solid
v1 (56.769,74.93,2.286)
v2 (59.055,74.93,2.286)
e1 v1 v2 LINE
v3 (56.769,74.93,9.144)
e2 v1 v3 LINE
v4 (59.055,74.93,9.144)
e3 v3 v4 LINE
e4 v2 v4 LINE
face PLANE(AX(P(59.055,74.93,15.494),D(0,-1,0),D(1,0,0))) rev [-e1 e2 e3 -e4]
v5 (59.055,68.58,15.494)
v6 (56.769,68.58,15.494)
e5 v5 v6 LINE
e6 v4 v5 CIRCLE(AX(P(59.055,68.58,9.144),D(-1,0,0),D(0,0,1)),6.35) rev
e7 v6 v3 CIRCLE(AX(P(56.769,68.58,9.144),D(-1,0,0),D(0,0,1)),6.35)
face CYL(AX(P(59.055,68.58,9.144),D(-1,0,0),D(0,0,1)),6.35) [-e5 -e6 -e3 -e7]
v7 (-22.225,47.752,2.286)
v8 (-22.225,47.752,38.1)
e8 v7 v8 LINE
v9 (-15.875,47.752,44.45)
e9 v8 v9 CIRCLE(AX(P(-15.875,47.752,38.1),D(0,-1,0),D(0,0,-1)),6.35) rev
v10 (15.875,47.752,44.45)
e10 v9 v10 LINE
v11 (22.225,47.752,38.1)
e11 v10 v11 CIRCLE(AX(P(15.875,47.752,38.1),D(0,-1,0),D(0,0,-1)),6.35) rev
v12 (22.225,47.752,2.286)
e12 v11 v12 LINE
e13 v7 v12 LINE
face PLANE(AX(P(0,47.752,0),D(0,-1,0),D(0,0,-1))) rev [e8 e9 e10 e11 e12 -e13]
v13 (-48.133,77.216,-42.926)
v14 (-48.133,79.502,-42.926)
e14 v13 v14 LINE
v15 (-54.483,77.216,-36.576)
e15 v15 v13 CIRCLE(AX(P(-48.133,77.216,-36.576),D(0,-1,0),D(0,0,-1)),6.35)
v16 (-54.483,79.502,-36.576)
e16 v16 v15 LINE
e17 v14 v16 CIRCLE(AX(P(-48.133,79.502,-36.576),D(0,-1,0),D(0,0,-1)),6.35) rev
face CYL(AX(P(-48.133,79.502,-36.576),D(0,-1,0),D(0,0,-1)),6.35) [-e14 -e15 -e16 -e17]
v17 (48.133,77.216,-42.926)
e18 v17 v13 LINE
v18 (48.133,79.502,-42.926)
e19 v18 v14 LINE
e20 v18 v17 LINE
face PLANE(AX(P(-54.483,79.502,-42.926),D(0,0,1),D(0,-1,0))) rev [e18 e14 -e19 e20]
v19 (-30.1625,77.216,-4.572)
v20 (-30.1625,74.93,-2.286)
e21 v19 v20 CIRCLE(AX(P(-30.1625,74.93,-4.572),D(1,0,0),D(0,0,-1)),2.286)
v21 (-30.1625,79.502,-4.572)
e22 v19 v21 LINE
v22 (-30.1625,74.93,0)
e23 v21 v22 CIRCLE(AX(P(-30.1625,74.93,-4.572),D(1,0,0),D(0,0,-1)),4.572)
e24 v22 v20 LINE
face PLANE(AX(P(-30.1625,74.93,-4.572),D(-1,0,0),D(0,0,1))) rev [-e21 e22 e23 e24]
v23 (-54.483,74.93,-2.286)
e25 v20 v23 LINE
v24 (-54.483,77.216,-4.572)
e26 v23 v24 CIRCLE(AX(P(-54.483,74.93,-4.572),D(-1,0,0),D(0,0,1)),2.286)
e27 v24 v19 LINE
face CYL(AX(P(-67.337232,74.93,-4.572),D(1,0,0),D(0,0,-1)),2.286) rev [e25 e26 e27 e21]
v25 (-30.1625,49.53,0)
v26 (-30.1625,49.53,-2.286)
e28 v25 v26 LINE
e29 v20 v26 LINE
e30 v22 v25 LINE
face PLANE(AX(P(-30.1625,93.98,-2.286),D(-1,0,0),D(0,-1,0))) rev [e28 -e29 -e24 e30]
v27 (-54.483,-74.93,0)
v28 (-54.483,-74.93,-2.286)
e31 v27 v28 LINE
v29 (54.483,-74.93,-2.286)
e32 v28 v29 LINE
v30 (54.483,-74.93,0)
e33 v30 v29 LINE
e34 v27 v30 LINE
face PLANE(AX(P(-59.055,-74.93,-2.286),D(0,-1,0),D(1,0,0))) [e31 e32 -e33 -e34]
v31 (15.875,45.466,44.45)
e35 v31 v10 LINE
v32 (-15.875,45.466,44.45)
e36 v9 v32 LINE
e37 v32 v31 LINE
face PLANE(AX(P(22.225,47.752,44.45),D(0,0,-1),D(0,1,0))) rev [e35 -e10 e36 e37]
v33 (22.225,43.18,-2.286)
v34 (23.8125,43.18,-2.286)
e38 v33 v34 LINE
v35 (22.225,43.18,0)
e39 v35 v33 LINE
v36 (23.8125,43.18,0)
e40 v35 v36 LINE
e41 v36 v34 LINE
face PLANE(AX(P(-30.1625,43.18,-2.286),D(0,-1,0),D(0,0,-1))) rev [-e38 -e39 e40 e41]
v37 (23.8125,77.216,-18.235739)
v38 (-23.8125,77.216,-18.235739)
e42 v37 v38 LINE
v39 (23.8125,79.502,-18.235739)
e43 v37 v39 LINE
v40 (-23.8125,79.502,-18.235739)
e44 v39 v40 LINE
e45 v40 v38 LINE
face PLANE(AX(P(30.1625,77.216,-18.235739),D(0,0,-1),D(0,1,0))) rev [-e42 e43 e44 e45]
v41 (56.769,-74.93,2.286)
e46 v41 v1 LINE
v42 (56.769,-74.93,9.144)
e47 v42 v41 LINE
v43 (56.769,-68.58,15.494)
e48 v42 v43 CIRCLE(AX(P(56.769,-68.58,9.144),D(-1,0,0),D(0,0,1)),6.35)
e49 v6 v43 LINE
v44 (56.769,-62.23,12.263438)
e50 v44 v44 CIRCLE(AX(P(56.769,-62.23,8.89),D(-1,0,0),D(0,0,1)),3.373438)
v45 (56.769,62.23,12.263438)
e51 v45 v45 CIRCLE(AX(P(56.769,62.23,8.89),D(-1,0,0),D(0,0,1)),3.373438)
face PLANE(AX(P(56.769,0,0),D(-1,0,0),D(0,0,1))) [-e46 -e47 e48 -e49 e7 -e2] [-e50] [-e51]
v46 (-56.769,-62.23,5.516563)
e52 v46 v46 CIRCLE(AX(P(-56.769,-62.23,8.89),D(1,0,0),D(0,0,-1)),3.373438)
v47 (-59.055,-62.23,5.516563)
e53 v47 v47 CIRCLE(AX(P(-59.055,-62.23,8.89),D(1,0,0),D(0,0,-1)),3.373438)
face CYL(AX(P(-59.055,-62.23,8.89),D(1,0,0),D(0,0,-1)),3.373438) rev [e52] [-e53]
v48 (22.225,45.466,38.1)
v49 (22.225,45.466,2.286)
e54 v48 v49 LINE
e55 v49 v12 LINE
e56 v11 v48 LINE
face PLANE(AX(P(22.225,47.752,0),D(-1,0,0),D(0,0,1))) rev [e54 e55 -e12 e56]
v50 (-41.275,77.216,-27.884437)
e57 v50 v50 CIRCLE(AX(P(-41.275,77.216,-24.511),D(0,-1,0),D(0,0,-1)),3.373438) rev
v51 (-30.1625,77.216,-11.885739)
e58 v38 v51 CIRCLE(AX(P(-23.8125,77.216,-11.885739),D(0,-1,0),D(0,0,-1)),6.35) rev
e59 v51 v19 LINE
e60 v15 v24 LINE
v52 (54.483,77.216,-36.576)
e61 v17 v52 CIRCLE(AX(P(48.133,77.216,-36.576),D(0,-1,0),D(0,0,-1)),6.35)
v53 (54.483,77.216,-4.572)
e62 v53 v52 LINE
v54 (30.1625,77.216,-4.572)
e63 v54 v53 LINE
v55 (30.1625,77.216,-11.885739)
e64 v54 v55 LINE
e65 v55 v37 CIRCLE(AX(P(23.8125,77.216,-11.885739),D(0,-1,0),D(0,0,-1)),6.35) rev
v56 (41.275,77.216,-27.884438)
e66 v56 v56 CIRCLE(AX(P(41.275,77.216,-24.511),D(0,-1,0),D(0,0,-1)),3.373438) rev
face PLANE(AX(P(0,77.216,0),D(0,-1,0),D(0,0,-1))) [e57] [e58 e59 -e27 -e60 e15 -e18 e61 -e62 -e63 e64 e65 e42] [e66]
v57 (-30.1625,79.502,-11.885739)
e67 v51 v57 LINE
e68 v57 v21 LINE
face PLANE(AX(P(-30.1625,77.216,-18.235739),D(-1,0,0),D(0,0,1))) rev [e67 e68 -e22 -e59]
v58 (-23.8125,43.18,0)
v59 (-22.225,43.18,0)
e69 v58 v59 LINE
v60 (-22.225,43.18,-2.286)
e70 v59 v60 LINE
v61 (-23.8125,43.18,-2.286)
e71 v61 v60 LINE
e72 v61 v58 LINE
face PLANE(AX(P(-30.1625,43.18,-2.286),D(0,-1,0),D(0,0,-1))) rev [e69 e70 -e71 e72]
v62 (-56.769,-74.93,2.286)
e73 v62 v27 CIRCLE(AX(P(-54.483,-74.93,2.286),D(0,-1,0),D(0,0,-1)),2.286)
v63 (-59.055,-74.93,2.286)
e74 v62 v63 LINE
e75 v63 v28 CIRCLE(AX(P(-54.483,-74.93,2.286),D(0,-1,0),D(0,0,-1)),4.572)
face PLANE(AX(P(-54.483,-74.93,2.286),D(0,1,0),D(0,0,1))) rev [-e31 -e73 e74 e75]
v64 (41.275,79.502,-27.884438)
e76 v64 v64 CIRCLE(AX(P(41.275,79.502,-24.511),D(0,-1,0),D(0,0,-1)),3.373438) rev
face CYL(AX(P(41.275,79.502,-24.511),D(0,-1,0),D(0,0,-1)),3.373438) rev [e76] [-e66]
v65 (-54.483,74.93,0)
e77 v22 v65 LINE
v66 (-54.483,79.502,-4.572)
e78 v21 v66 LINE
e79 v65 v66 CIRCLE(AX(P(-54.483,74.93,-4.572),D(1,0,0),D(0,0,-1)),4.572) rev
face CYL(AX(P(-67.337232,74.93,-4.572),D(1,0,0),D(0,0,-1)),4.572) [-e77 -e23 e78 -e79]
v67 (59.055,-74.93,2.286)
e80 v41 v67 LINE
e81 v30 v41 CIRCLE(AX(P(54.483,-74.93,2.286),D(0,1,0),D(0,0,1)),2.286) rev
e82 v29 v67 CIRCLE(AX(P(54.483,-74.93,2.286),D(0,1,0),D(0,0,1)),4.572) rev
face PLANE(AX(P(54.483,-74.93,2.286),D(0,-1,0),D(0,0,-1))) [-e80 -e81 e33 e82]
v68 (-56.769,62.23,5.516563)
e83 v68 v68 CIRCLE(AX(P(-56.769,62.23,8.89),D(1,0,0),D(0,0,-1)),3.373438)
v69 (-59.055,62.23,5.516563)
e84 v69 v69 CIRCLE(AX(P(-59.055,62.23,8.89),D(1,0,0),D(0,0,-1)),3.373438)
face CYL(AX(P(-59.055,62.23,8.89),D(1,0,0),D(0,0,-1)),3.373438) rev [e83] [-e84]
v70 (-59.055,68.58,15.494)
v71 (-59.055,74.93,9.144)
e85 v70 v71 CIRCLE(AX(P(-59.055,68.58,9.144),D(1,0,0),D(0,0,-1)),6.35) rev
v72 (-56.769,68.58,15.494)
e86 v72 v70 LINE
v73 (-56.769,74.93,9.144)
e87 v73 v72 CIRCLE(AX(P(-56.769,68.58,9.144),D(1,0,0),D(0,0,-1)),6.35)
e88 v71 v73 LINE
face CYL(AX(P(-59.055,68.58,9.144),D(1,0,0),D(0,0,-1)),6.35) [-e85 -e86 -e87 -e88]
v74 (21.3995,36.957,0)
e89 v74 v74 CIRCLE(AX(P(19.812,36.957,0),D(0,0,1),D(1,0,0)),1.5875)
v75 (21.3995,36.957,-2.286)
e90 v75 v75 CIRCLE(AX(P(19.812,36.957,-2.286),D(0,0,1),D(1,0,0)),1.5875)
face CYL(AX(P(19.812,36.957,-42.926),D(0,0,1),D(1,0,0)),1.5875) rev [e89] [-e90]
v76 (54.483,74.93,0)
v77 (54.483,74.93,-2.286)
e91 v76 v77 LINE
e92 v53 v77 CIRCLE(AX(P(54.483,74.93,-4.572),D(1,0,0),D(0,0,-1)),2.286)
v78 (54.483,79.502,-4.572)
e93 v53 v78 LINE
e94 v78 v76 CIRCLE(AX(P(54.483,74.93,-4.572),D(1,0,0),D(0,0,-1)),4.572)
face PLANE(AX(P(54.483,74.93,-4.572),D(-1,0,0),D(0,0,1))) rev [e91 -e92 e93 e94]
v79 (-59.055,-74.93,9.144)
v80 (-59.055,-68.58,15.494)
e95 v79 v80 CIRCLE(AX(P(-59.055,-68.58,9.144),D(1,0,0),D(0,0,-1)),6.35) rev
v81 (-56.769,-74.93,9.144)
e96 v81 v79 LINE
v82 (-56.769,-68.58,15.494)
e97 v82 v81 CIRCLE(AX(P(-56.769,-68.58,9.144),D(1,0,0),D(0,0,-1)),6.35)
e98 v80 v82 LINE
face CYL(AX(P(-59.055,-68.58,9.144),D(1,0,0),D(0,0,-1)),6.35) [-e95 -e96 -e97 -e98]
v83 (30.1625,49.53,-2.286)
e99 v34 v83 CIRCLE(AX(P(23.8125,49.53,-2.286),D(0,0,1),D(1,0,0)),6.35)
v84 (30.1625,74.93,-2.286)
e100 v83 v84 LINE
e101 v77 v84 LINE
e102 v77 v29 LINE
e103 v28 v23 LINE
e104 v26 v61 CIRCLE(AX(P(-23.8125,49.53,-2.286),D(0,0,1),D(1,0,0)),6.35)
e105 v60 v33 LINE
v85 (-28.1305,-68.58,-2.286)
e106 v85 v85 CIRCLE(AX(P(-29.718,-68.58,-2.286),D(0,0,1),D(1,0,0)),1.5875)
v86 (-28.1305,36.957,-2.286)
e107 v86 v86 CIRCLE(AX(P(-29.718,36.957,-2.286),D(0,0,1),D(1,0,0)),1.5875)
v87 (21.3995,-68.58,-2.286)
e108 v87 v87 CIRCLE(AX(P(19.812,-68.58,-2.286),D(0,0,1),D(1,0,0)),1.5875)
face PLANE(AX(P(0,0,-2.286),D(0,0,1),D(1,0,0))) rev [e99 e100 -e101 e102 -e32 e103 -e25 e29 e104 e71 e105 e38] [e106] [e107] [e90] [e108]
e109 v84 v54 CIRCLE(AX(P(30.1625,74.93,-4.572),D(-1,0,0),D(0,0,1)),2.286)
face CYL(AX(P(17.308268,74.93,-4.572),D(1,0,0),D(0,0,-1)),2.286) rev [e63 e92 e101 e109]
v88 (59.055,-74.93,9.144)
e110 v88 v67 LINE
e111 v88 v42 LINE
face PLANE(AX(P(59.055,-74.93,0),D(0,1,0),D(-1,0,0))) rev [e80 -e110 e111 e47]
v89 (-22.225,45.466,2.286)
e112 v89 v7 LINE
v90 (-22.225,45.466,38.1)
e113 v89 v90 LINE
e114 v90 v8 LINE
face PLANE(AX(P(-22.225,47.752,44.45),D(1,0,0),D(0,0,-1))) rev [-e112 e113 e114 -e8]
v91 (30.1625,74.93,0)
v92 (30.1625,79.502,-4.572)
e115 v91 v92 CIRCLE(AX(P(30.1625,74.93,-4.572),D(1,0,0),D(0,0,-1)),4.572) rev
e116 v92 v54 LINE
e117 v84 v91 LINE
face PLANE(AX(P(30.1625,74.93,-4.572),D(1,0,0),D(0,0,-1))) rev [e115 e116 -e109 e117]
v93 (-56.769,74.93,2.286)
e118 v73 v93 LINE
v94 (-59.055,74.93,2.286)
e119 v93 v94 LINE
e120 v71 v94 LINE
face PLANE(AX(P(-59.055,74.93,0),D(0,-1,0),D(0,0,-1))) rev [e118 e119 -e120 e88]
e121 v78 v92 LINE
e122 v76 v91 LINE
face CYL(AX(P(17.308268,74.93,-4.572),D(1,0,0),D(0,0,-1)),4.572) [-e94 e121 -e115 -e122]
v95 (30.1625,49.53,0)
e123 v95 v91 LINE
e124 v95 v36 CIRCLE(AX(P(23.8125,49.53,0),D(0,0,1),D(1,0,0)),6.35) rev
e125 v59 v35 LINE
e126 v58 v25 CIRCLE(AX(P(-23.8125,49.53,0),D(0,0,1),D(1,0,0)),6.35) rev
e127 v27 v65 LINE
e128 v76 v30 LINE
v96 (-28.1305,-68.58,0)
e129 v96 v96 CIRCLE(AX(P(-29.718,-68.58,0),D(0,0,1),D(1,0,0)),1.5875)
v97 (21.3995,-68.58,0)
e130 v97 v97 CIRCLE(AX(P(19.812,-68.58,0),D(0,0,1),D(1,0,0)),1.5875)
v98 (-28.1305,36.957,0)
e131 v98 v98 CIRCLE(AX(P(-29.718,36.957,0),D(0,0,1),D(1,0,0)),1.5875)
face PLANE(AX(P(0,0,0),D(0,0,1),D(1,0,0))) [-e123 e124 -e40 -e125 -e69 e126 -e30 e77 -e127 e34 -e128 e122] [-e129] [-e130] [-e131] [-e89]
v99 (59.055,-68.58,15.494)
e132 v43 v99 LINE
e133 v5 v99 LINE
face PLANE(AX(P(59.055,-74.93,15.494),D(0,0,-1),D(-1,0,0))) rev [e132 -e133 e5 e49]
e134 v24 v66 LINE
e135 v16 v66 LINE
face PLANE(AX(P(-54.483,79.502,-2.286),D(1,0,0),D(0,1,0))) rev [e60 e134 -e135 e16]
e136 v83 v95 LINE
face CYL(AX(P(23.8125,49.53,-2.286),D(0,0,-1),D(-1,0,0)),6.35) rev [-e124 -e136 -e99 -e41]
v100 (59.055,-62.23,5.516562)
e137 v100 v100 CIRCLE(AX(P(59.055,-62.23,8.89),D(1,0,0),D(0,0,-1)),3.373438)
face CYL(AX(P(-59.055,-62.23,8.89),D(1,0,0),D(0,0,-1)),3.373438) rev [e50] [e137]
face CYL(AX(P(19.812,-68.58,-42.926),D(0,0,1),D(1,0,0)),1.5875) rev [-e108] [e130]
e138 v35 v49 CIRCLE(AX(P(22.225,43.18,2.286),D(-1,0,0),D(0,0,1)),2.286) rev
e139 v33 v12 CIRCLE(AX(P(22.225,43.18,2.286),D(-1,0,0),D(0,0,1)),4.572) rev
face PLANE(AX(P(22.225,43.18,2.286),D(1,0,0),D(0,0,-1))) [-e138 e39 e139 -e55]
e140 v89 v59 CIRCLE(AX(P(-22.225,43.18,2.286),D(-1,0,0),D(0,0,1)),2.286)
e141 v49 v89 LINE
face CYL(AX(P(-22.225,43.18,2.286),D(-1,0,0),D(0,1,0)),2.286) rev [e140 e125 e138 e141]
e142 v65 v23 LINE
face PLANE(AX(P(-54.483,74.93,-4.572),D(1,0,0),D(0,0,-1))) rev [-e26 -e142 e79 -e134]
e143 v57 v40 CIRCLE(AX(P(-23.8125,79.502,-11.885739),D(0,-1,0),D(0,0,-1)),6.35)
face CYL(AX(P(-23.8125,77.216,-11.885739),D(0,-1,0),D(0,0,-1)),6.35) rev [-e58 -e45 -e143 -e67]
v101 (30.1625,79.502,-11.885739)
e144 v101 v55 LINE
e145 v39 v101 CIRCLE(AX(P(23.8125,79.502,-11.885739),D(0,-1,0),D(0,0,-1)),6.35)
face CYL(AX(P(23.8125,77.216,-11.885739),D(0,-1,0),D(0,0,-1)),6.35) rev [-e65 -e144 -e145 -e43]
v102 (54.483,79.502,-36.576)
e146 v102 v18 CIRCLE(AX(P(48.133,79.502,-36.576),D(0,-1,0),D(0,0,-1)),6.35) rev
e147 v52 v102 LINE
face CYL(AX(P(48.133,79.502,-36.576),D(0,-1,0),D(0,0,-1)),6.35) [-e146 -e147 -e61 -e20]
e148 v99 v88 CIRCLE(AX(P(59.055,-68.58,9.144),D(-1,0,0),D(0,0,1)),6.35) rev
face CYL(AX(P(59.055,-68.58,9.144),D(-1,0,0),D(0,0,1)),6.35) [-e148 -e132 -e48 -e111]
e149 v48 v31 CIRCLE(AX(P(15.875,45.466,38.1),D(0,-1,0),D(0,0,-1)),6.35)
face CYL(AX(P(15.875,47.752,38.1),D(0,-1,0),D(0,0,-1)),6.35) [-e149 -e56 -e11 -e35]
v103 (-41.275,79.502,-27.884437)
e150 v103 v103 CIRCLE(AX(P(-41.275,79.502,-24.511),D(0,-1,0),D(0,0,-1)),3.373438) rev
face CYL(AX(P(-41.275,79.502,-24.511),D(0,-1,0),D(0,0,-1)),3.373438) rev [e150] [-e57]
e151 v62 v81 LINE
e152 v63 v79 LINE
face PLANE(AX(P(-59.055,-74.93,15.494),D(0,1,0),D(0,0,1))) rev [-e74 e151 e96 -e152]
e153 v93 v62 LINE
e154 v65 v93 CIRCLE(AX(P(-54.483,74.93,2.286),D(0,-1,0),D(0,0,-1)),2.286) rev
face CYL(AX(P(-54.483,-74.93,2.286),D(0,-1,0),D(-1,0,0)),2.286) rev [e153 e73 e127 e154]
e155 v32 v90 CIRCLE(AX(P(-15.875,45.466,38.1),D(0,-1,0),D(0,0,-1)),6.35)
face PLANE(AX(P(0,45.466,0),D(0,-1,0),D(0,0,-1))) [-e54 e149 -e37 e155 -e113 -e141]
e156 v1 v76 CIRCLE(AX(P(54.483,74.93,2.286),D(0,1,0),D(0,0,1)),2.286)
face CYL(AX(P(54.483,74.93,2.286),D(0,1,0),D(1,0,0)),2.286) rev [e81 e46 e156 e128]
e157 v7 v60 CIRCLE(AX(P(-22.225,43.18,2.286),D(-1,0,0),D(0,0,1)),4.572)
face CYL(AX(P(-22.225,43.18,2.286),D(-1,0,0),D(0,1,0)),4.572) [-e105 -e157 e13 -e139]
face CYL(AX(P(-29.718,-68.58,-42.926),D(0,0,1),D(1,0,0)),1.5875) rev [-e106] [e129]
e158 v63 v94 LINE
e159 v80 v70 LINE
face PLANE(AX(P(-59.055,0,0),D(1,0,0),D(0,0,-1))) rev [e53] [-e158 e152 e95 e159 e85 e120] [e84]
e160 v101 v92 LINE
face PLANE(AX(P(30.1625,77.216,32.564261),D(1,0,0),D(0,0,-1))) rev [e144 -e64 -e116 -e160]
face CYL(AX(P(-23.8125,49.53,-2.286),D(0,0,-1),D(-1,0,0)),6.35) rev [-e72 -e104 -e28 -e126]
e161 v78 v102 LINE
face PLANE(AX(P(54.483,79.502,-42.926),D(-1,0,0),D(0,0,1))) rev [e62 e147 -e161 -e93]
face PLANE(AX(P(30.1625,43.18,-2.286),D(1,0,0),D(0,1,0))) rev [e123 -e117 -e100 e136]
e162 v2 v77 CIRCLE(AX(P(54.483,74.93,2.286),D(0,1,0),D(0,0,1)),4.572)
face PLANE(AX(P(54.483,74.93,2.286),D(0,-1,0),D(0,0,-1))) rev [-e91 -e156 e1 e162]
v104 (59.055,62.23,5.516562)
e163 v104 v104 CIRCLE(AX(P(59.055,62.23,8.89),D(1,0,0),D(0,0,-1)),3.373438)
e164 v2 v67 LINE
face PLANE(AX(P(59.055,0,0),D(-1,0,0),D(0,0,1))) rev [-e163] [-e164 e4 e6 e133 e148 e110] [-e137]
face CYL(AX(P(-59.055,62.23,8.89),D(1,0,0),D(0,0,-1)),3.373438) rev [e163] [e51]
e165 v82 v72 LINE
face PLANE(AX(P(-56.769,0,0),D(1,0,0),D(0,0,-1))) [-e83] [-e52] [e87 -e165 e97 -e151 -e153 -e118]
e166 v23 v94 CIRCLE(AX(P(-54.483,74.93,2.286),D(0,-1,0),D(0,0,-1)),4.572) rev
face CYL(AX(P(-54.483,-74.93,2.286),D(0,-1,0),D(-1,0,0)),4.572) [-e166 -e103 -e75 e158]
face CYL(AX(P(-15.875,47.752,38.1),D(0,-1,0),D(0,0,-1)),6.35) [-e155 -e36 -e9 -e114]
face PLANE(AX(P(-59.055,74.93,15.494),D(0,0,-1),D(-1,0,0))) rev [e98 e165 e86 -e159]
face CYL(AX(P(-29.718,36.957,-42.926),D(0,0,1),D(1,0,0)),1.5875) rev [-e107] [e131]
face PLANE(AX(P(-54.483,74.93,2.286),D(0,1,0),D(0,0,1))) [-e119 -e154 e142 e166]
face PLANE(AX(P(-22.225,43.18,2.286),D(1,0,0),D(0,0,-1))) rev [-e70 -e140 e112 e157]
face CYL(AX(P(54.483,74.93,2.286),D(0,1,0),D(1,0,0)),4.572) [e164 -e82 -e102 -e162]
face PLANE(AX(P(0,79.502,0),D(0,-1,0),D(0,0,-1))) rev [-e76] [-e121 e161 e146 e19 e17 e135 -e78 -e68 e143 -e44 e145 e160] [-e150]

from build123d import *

# Parameters (mm, degrees)
SKETCH1_W                      = 118.11
SKETCH1_H                      = 149.86
BASE_FLANGE1_DEPTH             = 2.286
EDGE_FLANGE1_STRIP_W           = 13.716
EDGE_FLANGE1_STRIP_H           = 2.286
EDGE_FLANGE1_STRIP_CUT_DEPTH   = 149.86
EDGE_FLANGE1_STRIP_2_W         = 13.716
EDGE_FLANGE1_STRIP_2_H         = 2.286
EDGE_FLANGE1_STRIP_CUT_2_DEPTH = 149.86
EDGE_FLANGE1_DEPTH             = 149.86
EDGE_FLANGE1_BEND_DEPTH        = 149.86
EDGE_FLANGE10_DEPTH            = 108.966
EDGE_FLANGE10_START            = 2.286
EDGE_FLANGE10_PROFILE_W        = 108.966
EDGE_FLANGE10_PROFILE_H        = 38.354
EDGE_FLANGE10_PROFILE_R        = 3.3734375
EDGE_FLANGE10_FLAT_DEPTH       = 2.286
UNFOLD6_START                  = -42.926
UNFOLD6_OUTLINE_W              = 108.966
UNFOLD6_OUTLINE_H              = 4.572
UNFOLD6_DEPTH                  = 40.64
UNFOLD6_START_2                = -2.286
UNFOLD6_2_OUTLINE_W            = 108.966
UNFOLD6_2_OUTLINE_H            = 43.740260605
UNFOLD6_2_OUTLINE_R            = 3.3734375
UNFOLD6_2_DEPTH                = 2.286
SKETCH121_W                    = 60.325
SKETCH121_H                    = 50.8
CUT_EXTRUDE3_DEPTH             = 134.454815623
EDGE_FLANGE16_DEPTH            = 44.45
FOLD3_START                    = -54.483
FOLD3_DEPTH                    = 108.966
FOLD3_START_2                  = -37.9015624
FOLD3_2_OUTLINE_W              = 2.286
FOLD3_2_OUTLINE_H              = 24.690260605
FOLD3_2_DEPTH                  = 75.8031248
FOLD3_3_DEPTH                  = 9.8345624
FOLD3_START_3                  = 44.6484376
FOLD3_4_DEPTH                  = 9.8345624
FOLD3_5_DEPTH                  = 24.3205
FOLD3_START_4                  = 30.1625
FOLD3_6_DEPTH                  = 24.3205
FOLD3_START_5                  = 77.216
FOLD3_7_DEPTH                  = 2.286
SKETCH128_R                    = 1.5875
CUT_EXTRUDE4_DEPTH             = 109.553505374
FILLET3_R                      = 6.35
SKETCH130_R                    = 3.3734375
CUT_EXTRUDE6_DEPTH             = 150.152078779


with BuildPart() as part:
    # Base-Flange1: sheet metal written as solids
    # Sketch1 → Base-Flange1 (new body)
    with BuildSketch(Plane.XY):
        Rectangle(SKETCH1_W, SKETCH1_H)
    extrude(amount=-BASE_FLANGE1_DEPTH)

    # Edge-Flange1: sheet metal written as solids
    # Edge-Flange1 strip (on a plane across the edge) → Edge-Flange1 strip cut (cut)
    with BuildSketch(Plane(origin=(-59.055, 74.93, 0), x_dir=(1, 0, 0), z_dir=(0, -1, 0))):
        with Locations((-2.286, -1.143)):
            Rectangle(EDGE_FLANGE1_STRIP_W, EDGE_FLANGE1_STRIP_H)
    extrude(amount=EDGE_FLANGE1_STRIP_CUT_DEPTH, mode=Mode.SUBTRACT)

    # Edge-Flange1 strip 2 (on a plane across the edge) → Edge-Flange1 strip cut 2 (cut)
    with BuildSketch(Plane(origin=(59.055, -74.93, 0), x_dir=(-1, 0, 0), z_dir=(0, 1, 0))):
        with Locations((-2.286, -1.143)):
            Rectangle(EDGE_FLANGE1_STRIP_2_W, EDGE_FLANGE1_STRIP_2_H)
    extrude(amount=EDGE_FLANGE1_STRIP_CUT_2_DEPTH, mode=Mode.SUBTRACT)

    # Edge-Flange1 section (on a plane across the edge) → Edge-Flange1 (add)
    with BuildSketch(Plane(origin=(-59.055, 74.93, 0), x_dir=(1, 0, 0), z_dir=(0, -1, 0))):
        with BuildLine():
            Line((0, 2.286), (0, 15.494))
            Line((0, 15.494), (2.286, 15.494))
            Line((2.286, 15.494), (2.286, 2.286))
            ThreePointArc((2.286, 2.286), (2.955553898, 0.669553898), (4.572, 0))
            Line((4.572, 0), (4.572, -2.286))
            ThreePointArc((4.572, -2.286), (1.339107796, -0.946892204), (0, 2.286))
        make_face()
    extrude(amount=EDGE_FLANGE1_DEPTH)

    # Edge-Flange1 section 2 (on a plane across the edge) → Edge-Flange1 bend (add)
    with BuildSketch(Plane(origin=(59.055, -74.93, 0), x_dir=(-1, 0, 0), z_dir=(0, 1, 0))):
        with BuildLine():
            Line((0, 2.286), (0, 15.494))
            Line((0, 15.494), (2.286, 15.494))
            Line((2.286, 15.494), (2.286, 2.286))
            ThreePointArc((2.286, 2.286), (2.955553898, 0.669553898), (4.572, 0))
            Line((4.572, 0), (4.572, -2.286))
            ThreePointArc((4.572, -2.286), (1.339107796, -0.946892204), (0, 2.286))
        make_face()
    extrude(amount=EDGE_FLANGE1_BEND_DEPTH)

    # Edge-Flange10: sheet metal written as solids
    # Edge-Flange10 bend section (on a plane across the edge) → Edge-Flange10 (add)
    with BuildSketch(Plane(origin=(-54.483, 77.216, -2.286), x_dir=(0, -1, 0), z_dir=(1, 0, 0))):
        with BuildLine():
            Line((-2.286, 2.286), (0, 2.286))
            ThreePointArc((0, 2.286), (0.669553898, 0.669553898), (2.286, 0))
            Line((2.286, 0), (2.286, -2.286))
            ThreePointArc((2.286, -2.286), (-0.946892204, -0.946892204), (-2.286, 2.286))
        make_face()
    extrude(amount=EDGE_FLANGE10_DEPTH)

    # Edge-Flange10 profile (on flange) → Edge-Flange10 flat (add)
    with BuildSketch(Plane(origin=(0, 77.216, -2.286), x_dir=(1, 0, 0), z_dir=(0, 1, 0)).offset(EDGE_FLANGE10_START)):
        with Locations((0, 21.463)):
            Rectangle(EDGE_FLANGE10_PROFILE_W, EDGE_FLANGE10_PROFILE_H)
        with Locations((41.275, 22.225)):
            Circle(EDGE_FLANGE10_PROFILE_R, mode=Mode.SUBTRACT)
        with Locations((-41.275, 22.225)):
            Circle(EDGE_FLANGE10_PROFILE_R, mode=Mode.SUBTRACT)
    extrude(amount=-EDGE_FLANGE10_FLAT_DEPTH)

    # Unfold6: read off the stored shape, not the designer's step
    # Unfold6 outline → Unfold6 (cut)
    with BuildSketch(Plane.XY.offset(UNFOLD6_START)):
        with Locations((0, 77.216)):
            Rectangle(UNFOLD6_OUTLINE_W, UNFOLD6_OUTLINE_H)
    extrude(amount=UNFOLD6_DEPTH, mode=Mode.SUBTRACT)

    # Unfold6 2 outline → Unfold6 2 (add)
    with BuildSketch(Plane.XY.offset(UNFOLD6_START_2)):
        with Locations((0, 96.800130303)):
            Rectangle(UNFOLD6_2_OUTLINE_W, UNFOLD6_2_OUTLINE_H)
        with Locations((-41.275, 100.255260605)):
            Circle(UNFOLD6_2_OUTLINE_R, mode=Mode.SUBTRACT)
        with Locations((41.275, 100.255260605)):
            Circle(UNFOLD6_2_OUTLINE_R, mode=Mode.SUBTRACT)
    extrude(amount=UNFOLD6_2_DEPTH)

    # Sketch121 → Cut-Extrude3 (cut, through all)
    with BuildSketch(Plane.XY):
        with Locations((0, 68.58)):
            Rectangle(SKETCH121_W, SKETCH121_H)
    extrude(amount=-CUT_EXTRUDE3_DEPTH, mode=Mode.SUBTRACT)

    # Edge-Flange16: sheet metal written as solids
    # Edge-Flange16 section (on a plane across the edge) → Edge-Flange16 (add)
    with BuildSketch(Plane(origin=(22.225, 45.466, 0), x_dir=(0, -1, 0), z_dir=(-1, 0, 0))):
        with BuildLine():
            Line((-2.286, 2.286), (-2.286, 44.45))
            Line((-2.286, 44.45), (0, 44.45))
            Line((0, 44.45), (0, 2.286))
            ThreePointArc((0, 2.286), (0.669553898, 0.669553898), (2.286, 0))
            Line((2.286, 0), (2.286, -2.286))
            ThreePointArc((2.286, -2.286), (-0.946892204, -0.946892204), (-2.286, 2.286))
        make_face()
    extrude(amount=EDGE_FLANGE16_DEPTH)

    # Fold3: read off the stored shape, not the designer's step
    # Fold3 outline → Fold3 (cut)
    with BuildSketch(Plane.YZ.offset(FOLD3_START)):
        with BuildLine():
            ThreePointArc((74.93, 0), (77.216, -0.612531854), (78.889468147, -2.286))
            Line((78.889468147, -2.286), (118.670260605, -2.286))
            Line((118.670260605, -2.286), (118.670260605, 0))
            Line((118.670260605, 0), (74.93, 0))
        make_face()
    extrude(amount=FOLD3_DEPTH, mode=Mode.SUBTRACT)

    # Fold3 3 outline → Fold3 3 (add)
    with BuildSketch(Plane.YZ.offset(FOLD3_START)):
        with BuildLine():
            ThreePointArc((74.93, -2.286), (76.546446102, -2.955553898), (77.216, -4.572))
            Line((77.216, -4.572), (77.216, -42.926))
            Line((77.216, -42.926), (79.502, -42.926))
            Line((79.502, -42.926), (79.502, -4.572))
            ThreePointArc((79.502, -4.572), (79.346212878, -3.388679326), (78.889468147, -2.286))
            Line((78.889468147, -2.286), (74.93, -2.286))
        make_face()
    extrude(amount=FOLD3_3_DEPTH)

    # Fold3 4 outline → Fold3 4 (add)
    with BuildSketch(Plane.YZ.offset(FOLD3_START_3)):
        with BuildLine():
            ThreePointArc((74.93, -2.286), (76.546446102, -2.955553898), (77.216, -4.572))
            Line((77.216, -4.572), (77.216, -42.926))
            Line((77.216, -42.926), (79.502, -42.926))
            Line((79.502, -42.926), (79.502, -4.572))
            ThreePointArc((79.502, -4.572), (79.346212878, -3.388679326), (78.889468147, -2.286))
            Line((78.889468147, -2.286), (74.93, -2.286))
        make_face()
    extrude(amount=FOLD3_4_DEPTH)



with BuildPart() as body_2:
    # Fold3 2 outline → Fold3 2 (new body)
    with BuildSketch(Plane.YZ.offset(FOLD3_START_2)):
        with Locations((78.359, -30.580869697)):
            Rectangle(FOLD3_2_OUTLINE_W, FOLD3_2_OUTLINE_H)
    extrude(amount=FOLD3_2_DEPTH)


with BuildPart() as part_1:
    add(part.part)

    add(body_2.part)  # Fold3 5 merges body 2
    # Fold3 5 outline → Fold3 5 (add)
    with BuildSketch(Plane.YZ.offset(FOLD3_START)):
        with BuildLine():
            ThreePointArc((74.93, -2.286), (76.546446102, -2.955553898), (77.216, -4.572))
            Line((77.216, -4.572), (77.216, -18.235739395))
            Line((77.216, -18.235739395), (79.502, -18.235739395))
            Line((79.502, -18.235739395), (79.502, -4.572))
            ThreePointArc((79.502, -4.572), (79.346212878, -3.388679326), (78.889468147, -2.286))
            Line((78.889468147, -2.286), (74.93, -2.286))
        make_face()
    extrude(amount=FOLD3_5_DEPTH)

    # Fold3 6 outline → Fold3 6 (add)
    with BuildSketch(Plane.YZ.offset(FOLD3_START_4)):
        with BuildLine():
            ThreePointArc((74.93, -2.286), (76.546446102, -2.955553898), (77.216, -4.572))
            Line((77.216, -4.572), (77.216, -18.235739395))
            Line((77.216, -18.235739395), (79.502, -18.235739395))
            Line((79.502, -18.235739395), (79.502, -4.572))
            ThreePointArc((79.502, -4.572), (79.346212878, -3.388679326), (78.889468147, -2.286))
            Line((78.889468147, -2.286), (74.93, -2.286))
        make_face()
    extrude(amount=FOLD3_6_DEPTH)

    # Fold3 7 outline → Fold3 7 (add)
    with BuildSketch(Plane(origin=(0, 0, 0), x_dir=(1, 0, 0), z_dir=(0, 1, 0)).offset(FOLD3_START_5)):
        with BuildLine():
            Line((44.6484376, 18.235739395), (44.6484375, 24.511))
            ThreePointArc((44.6484375, 24.511), (41.275, 21.1375625), (37.9015625, 24.511))
            Line((37.9015625, 24.511), (37.9015624, 18.235739395))
            Line((37.9015624, 18.235739395), (44.6484376, 18.235739395))
        make_face()
        with BuildLine():
            Line((-37.9015625, 24.511), (-37.9015624, 42.926))
            Line((-37.9015624, 42.926), (-44.6484376, 42.926))
            Line((-44.6484376, 42.926), (-44.6484375, 24.511))
            ThreePointArc((-44.6484375, 24.511), (-41.275, 27.8844375), (-37.9015625, 24.511))
        make_face()
        with BuildLine():
            ThreePointArc((37.9015625, 24.511), (41.275, 27.8844375), (44.6484375, 24.511))
            Line((44.6484375, 24.511), (44.6484376, 42.926))
            Line((44.6484376, 42.926), (37.9015624, 42.926))
            Line((37.9015624, 42.926), (37.9015625, 24.511))
        make_face()
        with BuildLine():
            Line((-37.9015624, 18.235739395), (-37.9015625, 24.511))
            ThreePointArc((-37.9015625, 24.511), (-41.275, 21.1375625), (-44.6484375, 24.511))
            Line((-44.6484375, 24.511), (-44.6484376, 18.235739395))
            Line((-44.6484376, 18.235739395), (-37.9015624, 18.235739395))
        make_face()
    extrude(amount=FOLD3_7_DEPTH)

    # Sketch128 → Cut-Extrude4 (cut, through all)
    with BuildSketch(Plane.XY):
        with Locations((-29.718, 36.957)):
            Circle(SKETCH128_R)
        with Locations((19.812, 36.957)):
            Circle(SKETCH128_R)
        with Locations((19.812, -68.58)):
            Circle(SKETCH128_R)
        with Locations((-29.718, -68.58)):
            Circle(SKETCH128_R)
    extrude(amount=-CUT_EXTRUDE4_DEPTH, mode=Mode.SUBTRACT)

    # Fillet3
    fillet3_edges = [part_1.edges().sort_by_distance(p)[0] for p in [
        (-57.912, 74.93, 15.494),
        (57.912, -74.93, 15.494),
        (-57.912, -74.93, 15.494),
        (-22.225, 46.609, 44.45),
        (22.225, 46.609, 44.45),
        (-54.483, 78.359, -42.926),
        (54.483, 78.359, -42.926),
        (57.912, 74.93, 15.494),
        (30.1625, 78.359, -18.235739395),
        (-30.1625, 78.359, -18.235739395),
        (-30.1625, 43.18, -1.143),
        (30.1625, 43.18, -1.143),
    ]]
    fillet(fillet3_edges, radius=FILLET3_R)

    # Sketch130 → Cut-Extrude6 (cut, through all)
    with BuildSketch(Plane(origin=(59.055, 0, 0), x_dir=(0, 0, -1), z_dir=(1, 0, 0))):
        with Locations((-8.89, -62.23)):
            Circle(SKETCH130_R)
        with Locations((-8.89, 62.23)):
            Circle(SKETCH130_R)
    extrude(amount=-CUT_EXTRUDE6_DEPTH, mode=Mode.SUBTRACT)


solid = part_1.part
